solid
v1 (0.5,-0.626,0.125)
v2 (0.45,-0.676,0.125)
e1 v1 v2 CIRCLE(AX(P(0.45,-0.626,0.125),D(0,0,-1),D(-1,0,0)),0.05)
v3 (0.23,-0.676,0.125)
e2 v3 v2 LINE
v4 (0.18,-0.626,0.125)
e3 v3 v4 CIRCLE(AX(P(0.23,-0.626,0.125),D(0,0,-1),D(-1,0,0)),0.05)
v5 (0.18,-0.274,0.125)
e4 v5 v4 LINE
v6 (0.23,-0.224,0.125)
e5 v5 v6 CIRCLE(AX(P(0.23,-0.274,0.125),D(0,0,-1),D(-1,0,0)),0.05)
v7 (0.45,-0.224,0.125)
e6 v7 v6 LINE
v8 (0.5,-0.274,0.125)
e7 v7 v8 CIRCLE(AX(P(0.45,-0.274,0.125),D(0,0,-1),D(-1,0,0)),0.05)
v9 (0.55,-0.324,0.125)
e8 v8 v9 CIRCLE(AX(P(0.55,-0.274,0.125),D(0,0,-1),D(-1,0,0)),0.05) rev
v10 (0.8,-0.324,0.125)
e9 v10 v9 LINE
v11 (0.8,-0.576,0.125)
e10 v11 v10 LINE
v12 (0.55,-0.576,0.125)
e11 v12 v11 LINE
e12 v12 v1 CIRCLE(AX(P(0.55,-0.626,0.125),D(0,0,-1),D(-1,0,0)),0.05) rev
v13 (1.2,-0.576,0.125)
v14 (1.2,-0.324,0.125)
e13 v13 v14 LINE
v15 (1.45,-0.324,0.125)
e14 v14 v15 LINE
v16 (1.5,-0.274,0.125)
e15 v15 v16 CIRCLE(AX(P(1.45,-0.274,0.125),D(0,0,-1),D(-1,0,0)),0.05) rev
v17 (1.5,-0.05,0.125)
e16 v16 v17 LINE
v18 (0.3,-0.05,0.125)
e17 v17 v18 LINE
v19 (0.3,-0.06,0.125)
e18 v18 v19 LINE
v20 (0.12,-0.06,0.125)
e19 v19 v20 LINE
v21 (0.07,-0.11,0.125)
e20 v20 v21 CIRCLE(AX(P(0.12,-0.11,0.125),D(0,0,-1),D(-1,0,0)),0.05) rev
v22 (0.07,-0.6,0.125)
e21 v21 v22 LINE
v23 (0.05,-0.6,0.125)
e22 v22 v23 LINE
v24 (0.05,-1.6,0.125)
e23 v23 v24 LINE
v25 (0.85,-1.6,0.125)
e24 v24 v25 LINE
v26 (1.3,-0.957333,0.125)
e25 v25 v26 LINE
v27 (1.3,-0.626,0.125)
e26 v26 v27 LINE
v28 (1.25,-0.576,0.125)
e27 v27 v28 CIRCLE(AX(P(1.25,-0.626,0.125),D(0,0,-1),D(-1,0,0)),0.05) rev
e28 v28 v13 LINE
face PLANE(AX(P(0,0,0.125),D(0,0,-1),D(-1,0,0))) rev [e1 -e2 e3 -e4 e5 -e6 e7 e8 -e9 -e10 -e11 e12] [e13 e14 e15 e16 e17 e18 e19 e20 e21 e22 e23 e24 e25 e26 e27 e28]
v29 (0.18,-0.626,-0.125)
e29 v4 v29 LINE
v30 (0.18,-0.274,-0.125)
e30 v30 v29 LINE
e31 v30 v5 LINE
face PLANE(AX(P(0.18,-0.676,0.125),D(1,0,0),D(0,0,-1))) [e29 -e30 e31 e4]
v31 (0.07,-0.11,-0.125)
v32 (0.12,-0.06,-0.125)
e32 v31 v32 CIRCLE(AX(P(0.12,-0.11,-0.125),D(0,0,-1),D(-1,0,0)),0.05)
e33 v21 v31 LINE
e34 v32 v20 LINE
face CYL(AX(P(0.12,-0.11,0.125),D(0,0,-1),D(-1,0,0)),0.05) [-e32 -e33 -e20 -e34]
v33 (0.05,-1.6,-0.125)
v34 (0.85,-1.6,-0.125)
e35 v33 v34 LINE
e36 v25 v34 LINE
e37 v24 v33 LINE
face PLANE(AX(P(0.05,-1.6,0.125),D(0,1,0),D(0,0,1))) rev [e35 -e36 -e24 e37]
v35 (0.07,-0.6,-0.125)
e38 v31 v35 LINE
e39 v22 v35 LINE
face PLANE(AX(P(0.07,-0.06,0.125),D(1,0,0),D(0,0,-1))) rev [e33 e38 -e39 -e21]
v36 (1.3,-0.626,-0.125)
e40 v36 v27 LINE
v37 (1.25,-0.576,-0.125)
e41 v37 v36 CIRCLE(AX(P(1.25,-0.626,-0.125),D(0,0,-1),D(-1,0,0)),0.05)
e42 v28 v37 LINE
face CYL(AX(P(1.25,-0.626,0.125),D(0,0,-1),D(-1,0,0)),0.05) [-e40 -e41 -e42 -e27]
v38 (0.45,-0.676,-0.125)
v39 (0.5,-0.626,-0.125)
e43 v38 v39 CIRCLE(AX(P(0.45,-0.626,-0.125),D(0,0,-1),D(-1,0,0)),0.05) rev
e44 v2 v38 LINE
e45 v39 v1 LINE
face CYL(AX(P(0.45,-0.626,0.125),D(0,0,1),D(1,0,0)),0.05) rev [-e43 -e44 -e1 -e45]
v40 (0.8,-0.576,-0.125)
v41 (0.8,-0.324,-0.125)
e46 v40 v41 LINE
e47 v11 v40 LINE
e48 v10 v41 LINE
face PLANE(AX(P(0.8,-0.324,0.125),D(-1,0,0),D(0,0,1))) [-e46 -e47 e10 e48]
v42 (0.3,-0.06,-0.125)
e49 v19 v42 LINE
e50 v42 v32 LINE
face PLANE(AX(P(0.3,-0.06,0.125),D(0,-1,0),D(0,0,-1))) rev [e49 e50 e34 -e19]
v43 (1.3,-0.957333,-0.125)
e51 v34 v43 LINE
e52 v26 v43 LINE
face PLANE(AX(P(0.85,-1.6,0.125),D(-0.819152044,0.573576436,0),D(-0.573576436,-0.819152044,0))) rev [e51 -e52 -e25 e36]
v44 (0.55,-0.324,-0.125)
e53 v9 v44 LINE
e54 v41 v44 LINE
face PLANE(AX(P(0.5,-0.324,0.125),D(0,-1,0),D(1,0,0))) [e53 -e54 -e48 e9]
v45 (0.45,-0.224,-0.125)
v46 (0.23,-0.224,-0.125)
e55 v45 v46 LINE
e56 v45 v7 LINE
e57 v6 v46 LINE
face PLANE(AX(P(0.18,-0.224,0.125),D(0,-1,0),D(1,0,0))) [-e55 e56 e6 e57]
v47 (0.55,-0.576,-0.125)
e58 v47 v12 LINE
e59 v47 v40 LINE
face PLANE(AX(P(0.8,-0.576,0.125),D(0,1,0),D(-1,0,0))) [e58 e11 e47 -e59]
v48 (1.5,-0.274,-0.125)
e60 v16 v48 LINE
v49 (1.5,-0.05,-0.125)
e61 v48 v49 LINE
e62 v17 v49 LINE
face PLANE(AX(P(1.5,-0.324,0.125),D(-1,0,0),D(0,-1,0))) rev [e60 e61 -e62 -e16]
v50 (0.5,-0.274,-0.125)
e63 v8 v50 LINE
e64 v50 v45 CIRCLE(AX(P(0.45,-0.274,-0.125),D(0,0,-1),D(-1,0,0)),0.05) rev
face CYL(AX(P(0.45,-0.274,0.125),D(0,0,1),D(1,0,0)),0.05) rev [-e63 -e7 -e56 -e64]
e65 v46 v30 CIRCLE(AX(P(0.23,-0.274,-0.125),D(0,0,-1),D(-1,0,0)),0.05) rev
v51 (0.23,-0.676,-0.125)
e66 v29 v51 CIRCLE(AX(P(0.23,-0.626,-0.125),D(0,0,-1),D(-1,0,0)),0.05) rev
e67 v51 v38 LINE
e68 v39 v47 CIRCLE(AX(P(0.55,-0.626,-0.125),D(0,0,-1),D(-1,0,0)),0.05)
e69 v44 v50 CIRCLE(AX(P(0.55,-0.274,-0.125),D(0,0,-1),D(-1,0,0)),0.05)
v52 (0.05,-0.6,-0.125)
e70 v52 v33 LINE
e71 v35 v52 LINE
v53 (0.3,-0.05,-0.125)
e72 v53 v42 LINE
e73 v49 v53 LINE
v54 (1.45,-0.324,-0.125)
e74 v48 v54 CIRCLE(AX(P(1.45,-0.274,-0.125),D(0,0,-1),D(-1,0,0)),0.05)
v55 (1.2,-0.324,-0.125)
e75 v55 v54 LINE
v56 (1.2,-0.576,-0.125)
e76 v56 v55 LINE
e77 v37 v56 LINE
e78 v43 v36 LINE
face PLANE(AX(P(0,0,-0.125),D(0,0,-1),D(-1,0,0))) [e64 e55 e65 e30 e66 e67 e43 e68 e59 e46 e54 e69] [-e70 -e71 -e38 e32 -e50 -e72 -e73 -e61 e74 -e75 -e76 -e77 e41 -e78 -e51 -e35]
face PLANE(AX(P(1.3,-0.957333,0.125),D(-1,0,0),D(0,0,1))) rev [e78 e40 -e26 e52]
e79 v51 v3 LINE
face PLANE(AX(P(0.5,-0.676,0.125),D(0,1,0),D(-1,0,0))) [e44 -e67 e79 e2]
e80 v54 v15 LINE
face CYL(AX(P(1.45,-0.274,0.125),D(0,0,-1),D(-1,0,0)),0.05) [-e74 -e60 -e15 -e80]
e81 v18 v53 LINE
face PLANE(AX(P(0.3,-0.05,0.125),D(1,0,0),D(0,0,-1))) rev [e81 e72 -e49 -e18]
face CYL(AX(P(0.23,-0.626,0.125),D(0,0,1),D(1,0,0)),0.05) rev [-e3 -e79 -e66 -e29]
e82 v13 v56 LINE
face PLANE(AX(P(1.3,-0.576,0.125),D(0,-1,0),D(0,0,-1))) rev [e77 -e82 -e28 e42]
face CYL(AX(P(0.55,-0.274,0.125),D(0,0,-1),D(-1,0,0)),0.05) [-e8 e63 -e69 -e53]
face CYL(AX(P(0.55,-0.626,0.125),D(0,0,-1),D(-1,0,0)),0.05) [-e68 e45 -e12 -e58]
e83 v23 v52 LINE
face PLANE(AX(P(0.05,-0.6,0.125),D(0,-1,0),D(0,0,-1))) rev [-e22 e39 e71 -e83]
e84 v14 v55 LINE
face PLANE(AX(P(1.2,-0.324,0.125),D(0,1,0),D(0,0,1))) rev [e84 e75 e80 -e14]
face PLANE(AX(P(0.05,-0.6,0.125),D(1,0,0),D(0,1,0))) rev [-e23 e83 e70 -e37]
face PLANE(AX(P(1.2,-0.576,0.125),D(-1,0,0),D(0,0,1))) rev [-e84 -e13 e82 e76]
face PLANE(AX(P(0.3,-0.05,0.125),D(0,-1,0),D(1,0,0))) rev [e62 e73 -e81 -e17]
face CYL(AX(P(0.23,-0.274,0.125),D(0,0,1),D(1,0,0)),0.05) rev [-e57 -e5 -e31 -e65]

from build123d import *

# Parameters (mm, degrees)
BOSS_EXTRUDE1_DEPTH = 0.125
FILLET1_R           = 0.05


with BuildPart() as part:
    # frame_outline → Boss-Extrude1 (new, symmetric)
    with BuildSketch(Plane.XY):
        Polygon((0.3, -0.05), (1.5, -0.05), (1.5, -0.324), (1.2, -0.324), (1.2, -0.576), (1.3, -0.576), (1.3, -0.957333397), (0.85, -1.6), (0.05, -1.6), (0.05, -0.6), (0.07, -0.6), (0.07, -0.06), (0.3, -0.06), align=None)
        Polygon((0.5, -0.324), (0.8, -0.324), (0.8, -0.576), (0.5, -0.576), (0.5, -0.676), (0.18, -0.676), (0.18, -0.224), (0.5, -0.224), align=None, mode=Mode.SUBTRACT)
    extrude(amount=BOSS_EXTRUDE1_DEPTH, both=True)

    # Fillet1
    fillet1_edges = [part.edges().sort_by_distance(p)[0] for p in [
        (1.3, -0.576, 0),
        (1.5, -0.324, 0),
        (0.5, -0.324, 0),
        (0.5, -0.576, 0),
        (0.5, -0.676, 0),
        (0.18, -0.676, 0),
        (0.5, -0.224, 0),
        (0.18, -0.224, 0),
        (0.07, -0.06, 0),
    ]]
    fillet(fillet1_edges, radius=FILLET1_R - 0.0001)  # a hair under: the kernel refuses the full size


solid = part.part
